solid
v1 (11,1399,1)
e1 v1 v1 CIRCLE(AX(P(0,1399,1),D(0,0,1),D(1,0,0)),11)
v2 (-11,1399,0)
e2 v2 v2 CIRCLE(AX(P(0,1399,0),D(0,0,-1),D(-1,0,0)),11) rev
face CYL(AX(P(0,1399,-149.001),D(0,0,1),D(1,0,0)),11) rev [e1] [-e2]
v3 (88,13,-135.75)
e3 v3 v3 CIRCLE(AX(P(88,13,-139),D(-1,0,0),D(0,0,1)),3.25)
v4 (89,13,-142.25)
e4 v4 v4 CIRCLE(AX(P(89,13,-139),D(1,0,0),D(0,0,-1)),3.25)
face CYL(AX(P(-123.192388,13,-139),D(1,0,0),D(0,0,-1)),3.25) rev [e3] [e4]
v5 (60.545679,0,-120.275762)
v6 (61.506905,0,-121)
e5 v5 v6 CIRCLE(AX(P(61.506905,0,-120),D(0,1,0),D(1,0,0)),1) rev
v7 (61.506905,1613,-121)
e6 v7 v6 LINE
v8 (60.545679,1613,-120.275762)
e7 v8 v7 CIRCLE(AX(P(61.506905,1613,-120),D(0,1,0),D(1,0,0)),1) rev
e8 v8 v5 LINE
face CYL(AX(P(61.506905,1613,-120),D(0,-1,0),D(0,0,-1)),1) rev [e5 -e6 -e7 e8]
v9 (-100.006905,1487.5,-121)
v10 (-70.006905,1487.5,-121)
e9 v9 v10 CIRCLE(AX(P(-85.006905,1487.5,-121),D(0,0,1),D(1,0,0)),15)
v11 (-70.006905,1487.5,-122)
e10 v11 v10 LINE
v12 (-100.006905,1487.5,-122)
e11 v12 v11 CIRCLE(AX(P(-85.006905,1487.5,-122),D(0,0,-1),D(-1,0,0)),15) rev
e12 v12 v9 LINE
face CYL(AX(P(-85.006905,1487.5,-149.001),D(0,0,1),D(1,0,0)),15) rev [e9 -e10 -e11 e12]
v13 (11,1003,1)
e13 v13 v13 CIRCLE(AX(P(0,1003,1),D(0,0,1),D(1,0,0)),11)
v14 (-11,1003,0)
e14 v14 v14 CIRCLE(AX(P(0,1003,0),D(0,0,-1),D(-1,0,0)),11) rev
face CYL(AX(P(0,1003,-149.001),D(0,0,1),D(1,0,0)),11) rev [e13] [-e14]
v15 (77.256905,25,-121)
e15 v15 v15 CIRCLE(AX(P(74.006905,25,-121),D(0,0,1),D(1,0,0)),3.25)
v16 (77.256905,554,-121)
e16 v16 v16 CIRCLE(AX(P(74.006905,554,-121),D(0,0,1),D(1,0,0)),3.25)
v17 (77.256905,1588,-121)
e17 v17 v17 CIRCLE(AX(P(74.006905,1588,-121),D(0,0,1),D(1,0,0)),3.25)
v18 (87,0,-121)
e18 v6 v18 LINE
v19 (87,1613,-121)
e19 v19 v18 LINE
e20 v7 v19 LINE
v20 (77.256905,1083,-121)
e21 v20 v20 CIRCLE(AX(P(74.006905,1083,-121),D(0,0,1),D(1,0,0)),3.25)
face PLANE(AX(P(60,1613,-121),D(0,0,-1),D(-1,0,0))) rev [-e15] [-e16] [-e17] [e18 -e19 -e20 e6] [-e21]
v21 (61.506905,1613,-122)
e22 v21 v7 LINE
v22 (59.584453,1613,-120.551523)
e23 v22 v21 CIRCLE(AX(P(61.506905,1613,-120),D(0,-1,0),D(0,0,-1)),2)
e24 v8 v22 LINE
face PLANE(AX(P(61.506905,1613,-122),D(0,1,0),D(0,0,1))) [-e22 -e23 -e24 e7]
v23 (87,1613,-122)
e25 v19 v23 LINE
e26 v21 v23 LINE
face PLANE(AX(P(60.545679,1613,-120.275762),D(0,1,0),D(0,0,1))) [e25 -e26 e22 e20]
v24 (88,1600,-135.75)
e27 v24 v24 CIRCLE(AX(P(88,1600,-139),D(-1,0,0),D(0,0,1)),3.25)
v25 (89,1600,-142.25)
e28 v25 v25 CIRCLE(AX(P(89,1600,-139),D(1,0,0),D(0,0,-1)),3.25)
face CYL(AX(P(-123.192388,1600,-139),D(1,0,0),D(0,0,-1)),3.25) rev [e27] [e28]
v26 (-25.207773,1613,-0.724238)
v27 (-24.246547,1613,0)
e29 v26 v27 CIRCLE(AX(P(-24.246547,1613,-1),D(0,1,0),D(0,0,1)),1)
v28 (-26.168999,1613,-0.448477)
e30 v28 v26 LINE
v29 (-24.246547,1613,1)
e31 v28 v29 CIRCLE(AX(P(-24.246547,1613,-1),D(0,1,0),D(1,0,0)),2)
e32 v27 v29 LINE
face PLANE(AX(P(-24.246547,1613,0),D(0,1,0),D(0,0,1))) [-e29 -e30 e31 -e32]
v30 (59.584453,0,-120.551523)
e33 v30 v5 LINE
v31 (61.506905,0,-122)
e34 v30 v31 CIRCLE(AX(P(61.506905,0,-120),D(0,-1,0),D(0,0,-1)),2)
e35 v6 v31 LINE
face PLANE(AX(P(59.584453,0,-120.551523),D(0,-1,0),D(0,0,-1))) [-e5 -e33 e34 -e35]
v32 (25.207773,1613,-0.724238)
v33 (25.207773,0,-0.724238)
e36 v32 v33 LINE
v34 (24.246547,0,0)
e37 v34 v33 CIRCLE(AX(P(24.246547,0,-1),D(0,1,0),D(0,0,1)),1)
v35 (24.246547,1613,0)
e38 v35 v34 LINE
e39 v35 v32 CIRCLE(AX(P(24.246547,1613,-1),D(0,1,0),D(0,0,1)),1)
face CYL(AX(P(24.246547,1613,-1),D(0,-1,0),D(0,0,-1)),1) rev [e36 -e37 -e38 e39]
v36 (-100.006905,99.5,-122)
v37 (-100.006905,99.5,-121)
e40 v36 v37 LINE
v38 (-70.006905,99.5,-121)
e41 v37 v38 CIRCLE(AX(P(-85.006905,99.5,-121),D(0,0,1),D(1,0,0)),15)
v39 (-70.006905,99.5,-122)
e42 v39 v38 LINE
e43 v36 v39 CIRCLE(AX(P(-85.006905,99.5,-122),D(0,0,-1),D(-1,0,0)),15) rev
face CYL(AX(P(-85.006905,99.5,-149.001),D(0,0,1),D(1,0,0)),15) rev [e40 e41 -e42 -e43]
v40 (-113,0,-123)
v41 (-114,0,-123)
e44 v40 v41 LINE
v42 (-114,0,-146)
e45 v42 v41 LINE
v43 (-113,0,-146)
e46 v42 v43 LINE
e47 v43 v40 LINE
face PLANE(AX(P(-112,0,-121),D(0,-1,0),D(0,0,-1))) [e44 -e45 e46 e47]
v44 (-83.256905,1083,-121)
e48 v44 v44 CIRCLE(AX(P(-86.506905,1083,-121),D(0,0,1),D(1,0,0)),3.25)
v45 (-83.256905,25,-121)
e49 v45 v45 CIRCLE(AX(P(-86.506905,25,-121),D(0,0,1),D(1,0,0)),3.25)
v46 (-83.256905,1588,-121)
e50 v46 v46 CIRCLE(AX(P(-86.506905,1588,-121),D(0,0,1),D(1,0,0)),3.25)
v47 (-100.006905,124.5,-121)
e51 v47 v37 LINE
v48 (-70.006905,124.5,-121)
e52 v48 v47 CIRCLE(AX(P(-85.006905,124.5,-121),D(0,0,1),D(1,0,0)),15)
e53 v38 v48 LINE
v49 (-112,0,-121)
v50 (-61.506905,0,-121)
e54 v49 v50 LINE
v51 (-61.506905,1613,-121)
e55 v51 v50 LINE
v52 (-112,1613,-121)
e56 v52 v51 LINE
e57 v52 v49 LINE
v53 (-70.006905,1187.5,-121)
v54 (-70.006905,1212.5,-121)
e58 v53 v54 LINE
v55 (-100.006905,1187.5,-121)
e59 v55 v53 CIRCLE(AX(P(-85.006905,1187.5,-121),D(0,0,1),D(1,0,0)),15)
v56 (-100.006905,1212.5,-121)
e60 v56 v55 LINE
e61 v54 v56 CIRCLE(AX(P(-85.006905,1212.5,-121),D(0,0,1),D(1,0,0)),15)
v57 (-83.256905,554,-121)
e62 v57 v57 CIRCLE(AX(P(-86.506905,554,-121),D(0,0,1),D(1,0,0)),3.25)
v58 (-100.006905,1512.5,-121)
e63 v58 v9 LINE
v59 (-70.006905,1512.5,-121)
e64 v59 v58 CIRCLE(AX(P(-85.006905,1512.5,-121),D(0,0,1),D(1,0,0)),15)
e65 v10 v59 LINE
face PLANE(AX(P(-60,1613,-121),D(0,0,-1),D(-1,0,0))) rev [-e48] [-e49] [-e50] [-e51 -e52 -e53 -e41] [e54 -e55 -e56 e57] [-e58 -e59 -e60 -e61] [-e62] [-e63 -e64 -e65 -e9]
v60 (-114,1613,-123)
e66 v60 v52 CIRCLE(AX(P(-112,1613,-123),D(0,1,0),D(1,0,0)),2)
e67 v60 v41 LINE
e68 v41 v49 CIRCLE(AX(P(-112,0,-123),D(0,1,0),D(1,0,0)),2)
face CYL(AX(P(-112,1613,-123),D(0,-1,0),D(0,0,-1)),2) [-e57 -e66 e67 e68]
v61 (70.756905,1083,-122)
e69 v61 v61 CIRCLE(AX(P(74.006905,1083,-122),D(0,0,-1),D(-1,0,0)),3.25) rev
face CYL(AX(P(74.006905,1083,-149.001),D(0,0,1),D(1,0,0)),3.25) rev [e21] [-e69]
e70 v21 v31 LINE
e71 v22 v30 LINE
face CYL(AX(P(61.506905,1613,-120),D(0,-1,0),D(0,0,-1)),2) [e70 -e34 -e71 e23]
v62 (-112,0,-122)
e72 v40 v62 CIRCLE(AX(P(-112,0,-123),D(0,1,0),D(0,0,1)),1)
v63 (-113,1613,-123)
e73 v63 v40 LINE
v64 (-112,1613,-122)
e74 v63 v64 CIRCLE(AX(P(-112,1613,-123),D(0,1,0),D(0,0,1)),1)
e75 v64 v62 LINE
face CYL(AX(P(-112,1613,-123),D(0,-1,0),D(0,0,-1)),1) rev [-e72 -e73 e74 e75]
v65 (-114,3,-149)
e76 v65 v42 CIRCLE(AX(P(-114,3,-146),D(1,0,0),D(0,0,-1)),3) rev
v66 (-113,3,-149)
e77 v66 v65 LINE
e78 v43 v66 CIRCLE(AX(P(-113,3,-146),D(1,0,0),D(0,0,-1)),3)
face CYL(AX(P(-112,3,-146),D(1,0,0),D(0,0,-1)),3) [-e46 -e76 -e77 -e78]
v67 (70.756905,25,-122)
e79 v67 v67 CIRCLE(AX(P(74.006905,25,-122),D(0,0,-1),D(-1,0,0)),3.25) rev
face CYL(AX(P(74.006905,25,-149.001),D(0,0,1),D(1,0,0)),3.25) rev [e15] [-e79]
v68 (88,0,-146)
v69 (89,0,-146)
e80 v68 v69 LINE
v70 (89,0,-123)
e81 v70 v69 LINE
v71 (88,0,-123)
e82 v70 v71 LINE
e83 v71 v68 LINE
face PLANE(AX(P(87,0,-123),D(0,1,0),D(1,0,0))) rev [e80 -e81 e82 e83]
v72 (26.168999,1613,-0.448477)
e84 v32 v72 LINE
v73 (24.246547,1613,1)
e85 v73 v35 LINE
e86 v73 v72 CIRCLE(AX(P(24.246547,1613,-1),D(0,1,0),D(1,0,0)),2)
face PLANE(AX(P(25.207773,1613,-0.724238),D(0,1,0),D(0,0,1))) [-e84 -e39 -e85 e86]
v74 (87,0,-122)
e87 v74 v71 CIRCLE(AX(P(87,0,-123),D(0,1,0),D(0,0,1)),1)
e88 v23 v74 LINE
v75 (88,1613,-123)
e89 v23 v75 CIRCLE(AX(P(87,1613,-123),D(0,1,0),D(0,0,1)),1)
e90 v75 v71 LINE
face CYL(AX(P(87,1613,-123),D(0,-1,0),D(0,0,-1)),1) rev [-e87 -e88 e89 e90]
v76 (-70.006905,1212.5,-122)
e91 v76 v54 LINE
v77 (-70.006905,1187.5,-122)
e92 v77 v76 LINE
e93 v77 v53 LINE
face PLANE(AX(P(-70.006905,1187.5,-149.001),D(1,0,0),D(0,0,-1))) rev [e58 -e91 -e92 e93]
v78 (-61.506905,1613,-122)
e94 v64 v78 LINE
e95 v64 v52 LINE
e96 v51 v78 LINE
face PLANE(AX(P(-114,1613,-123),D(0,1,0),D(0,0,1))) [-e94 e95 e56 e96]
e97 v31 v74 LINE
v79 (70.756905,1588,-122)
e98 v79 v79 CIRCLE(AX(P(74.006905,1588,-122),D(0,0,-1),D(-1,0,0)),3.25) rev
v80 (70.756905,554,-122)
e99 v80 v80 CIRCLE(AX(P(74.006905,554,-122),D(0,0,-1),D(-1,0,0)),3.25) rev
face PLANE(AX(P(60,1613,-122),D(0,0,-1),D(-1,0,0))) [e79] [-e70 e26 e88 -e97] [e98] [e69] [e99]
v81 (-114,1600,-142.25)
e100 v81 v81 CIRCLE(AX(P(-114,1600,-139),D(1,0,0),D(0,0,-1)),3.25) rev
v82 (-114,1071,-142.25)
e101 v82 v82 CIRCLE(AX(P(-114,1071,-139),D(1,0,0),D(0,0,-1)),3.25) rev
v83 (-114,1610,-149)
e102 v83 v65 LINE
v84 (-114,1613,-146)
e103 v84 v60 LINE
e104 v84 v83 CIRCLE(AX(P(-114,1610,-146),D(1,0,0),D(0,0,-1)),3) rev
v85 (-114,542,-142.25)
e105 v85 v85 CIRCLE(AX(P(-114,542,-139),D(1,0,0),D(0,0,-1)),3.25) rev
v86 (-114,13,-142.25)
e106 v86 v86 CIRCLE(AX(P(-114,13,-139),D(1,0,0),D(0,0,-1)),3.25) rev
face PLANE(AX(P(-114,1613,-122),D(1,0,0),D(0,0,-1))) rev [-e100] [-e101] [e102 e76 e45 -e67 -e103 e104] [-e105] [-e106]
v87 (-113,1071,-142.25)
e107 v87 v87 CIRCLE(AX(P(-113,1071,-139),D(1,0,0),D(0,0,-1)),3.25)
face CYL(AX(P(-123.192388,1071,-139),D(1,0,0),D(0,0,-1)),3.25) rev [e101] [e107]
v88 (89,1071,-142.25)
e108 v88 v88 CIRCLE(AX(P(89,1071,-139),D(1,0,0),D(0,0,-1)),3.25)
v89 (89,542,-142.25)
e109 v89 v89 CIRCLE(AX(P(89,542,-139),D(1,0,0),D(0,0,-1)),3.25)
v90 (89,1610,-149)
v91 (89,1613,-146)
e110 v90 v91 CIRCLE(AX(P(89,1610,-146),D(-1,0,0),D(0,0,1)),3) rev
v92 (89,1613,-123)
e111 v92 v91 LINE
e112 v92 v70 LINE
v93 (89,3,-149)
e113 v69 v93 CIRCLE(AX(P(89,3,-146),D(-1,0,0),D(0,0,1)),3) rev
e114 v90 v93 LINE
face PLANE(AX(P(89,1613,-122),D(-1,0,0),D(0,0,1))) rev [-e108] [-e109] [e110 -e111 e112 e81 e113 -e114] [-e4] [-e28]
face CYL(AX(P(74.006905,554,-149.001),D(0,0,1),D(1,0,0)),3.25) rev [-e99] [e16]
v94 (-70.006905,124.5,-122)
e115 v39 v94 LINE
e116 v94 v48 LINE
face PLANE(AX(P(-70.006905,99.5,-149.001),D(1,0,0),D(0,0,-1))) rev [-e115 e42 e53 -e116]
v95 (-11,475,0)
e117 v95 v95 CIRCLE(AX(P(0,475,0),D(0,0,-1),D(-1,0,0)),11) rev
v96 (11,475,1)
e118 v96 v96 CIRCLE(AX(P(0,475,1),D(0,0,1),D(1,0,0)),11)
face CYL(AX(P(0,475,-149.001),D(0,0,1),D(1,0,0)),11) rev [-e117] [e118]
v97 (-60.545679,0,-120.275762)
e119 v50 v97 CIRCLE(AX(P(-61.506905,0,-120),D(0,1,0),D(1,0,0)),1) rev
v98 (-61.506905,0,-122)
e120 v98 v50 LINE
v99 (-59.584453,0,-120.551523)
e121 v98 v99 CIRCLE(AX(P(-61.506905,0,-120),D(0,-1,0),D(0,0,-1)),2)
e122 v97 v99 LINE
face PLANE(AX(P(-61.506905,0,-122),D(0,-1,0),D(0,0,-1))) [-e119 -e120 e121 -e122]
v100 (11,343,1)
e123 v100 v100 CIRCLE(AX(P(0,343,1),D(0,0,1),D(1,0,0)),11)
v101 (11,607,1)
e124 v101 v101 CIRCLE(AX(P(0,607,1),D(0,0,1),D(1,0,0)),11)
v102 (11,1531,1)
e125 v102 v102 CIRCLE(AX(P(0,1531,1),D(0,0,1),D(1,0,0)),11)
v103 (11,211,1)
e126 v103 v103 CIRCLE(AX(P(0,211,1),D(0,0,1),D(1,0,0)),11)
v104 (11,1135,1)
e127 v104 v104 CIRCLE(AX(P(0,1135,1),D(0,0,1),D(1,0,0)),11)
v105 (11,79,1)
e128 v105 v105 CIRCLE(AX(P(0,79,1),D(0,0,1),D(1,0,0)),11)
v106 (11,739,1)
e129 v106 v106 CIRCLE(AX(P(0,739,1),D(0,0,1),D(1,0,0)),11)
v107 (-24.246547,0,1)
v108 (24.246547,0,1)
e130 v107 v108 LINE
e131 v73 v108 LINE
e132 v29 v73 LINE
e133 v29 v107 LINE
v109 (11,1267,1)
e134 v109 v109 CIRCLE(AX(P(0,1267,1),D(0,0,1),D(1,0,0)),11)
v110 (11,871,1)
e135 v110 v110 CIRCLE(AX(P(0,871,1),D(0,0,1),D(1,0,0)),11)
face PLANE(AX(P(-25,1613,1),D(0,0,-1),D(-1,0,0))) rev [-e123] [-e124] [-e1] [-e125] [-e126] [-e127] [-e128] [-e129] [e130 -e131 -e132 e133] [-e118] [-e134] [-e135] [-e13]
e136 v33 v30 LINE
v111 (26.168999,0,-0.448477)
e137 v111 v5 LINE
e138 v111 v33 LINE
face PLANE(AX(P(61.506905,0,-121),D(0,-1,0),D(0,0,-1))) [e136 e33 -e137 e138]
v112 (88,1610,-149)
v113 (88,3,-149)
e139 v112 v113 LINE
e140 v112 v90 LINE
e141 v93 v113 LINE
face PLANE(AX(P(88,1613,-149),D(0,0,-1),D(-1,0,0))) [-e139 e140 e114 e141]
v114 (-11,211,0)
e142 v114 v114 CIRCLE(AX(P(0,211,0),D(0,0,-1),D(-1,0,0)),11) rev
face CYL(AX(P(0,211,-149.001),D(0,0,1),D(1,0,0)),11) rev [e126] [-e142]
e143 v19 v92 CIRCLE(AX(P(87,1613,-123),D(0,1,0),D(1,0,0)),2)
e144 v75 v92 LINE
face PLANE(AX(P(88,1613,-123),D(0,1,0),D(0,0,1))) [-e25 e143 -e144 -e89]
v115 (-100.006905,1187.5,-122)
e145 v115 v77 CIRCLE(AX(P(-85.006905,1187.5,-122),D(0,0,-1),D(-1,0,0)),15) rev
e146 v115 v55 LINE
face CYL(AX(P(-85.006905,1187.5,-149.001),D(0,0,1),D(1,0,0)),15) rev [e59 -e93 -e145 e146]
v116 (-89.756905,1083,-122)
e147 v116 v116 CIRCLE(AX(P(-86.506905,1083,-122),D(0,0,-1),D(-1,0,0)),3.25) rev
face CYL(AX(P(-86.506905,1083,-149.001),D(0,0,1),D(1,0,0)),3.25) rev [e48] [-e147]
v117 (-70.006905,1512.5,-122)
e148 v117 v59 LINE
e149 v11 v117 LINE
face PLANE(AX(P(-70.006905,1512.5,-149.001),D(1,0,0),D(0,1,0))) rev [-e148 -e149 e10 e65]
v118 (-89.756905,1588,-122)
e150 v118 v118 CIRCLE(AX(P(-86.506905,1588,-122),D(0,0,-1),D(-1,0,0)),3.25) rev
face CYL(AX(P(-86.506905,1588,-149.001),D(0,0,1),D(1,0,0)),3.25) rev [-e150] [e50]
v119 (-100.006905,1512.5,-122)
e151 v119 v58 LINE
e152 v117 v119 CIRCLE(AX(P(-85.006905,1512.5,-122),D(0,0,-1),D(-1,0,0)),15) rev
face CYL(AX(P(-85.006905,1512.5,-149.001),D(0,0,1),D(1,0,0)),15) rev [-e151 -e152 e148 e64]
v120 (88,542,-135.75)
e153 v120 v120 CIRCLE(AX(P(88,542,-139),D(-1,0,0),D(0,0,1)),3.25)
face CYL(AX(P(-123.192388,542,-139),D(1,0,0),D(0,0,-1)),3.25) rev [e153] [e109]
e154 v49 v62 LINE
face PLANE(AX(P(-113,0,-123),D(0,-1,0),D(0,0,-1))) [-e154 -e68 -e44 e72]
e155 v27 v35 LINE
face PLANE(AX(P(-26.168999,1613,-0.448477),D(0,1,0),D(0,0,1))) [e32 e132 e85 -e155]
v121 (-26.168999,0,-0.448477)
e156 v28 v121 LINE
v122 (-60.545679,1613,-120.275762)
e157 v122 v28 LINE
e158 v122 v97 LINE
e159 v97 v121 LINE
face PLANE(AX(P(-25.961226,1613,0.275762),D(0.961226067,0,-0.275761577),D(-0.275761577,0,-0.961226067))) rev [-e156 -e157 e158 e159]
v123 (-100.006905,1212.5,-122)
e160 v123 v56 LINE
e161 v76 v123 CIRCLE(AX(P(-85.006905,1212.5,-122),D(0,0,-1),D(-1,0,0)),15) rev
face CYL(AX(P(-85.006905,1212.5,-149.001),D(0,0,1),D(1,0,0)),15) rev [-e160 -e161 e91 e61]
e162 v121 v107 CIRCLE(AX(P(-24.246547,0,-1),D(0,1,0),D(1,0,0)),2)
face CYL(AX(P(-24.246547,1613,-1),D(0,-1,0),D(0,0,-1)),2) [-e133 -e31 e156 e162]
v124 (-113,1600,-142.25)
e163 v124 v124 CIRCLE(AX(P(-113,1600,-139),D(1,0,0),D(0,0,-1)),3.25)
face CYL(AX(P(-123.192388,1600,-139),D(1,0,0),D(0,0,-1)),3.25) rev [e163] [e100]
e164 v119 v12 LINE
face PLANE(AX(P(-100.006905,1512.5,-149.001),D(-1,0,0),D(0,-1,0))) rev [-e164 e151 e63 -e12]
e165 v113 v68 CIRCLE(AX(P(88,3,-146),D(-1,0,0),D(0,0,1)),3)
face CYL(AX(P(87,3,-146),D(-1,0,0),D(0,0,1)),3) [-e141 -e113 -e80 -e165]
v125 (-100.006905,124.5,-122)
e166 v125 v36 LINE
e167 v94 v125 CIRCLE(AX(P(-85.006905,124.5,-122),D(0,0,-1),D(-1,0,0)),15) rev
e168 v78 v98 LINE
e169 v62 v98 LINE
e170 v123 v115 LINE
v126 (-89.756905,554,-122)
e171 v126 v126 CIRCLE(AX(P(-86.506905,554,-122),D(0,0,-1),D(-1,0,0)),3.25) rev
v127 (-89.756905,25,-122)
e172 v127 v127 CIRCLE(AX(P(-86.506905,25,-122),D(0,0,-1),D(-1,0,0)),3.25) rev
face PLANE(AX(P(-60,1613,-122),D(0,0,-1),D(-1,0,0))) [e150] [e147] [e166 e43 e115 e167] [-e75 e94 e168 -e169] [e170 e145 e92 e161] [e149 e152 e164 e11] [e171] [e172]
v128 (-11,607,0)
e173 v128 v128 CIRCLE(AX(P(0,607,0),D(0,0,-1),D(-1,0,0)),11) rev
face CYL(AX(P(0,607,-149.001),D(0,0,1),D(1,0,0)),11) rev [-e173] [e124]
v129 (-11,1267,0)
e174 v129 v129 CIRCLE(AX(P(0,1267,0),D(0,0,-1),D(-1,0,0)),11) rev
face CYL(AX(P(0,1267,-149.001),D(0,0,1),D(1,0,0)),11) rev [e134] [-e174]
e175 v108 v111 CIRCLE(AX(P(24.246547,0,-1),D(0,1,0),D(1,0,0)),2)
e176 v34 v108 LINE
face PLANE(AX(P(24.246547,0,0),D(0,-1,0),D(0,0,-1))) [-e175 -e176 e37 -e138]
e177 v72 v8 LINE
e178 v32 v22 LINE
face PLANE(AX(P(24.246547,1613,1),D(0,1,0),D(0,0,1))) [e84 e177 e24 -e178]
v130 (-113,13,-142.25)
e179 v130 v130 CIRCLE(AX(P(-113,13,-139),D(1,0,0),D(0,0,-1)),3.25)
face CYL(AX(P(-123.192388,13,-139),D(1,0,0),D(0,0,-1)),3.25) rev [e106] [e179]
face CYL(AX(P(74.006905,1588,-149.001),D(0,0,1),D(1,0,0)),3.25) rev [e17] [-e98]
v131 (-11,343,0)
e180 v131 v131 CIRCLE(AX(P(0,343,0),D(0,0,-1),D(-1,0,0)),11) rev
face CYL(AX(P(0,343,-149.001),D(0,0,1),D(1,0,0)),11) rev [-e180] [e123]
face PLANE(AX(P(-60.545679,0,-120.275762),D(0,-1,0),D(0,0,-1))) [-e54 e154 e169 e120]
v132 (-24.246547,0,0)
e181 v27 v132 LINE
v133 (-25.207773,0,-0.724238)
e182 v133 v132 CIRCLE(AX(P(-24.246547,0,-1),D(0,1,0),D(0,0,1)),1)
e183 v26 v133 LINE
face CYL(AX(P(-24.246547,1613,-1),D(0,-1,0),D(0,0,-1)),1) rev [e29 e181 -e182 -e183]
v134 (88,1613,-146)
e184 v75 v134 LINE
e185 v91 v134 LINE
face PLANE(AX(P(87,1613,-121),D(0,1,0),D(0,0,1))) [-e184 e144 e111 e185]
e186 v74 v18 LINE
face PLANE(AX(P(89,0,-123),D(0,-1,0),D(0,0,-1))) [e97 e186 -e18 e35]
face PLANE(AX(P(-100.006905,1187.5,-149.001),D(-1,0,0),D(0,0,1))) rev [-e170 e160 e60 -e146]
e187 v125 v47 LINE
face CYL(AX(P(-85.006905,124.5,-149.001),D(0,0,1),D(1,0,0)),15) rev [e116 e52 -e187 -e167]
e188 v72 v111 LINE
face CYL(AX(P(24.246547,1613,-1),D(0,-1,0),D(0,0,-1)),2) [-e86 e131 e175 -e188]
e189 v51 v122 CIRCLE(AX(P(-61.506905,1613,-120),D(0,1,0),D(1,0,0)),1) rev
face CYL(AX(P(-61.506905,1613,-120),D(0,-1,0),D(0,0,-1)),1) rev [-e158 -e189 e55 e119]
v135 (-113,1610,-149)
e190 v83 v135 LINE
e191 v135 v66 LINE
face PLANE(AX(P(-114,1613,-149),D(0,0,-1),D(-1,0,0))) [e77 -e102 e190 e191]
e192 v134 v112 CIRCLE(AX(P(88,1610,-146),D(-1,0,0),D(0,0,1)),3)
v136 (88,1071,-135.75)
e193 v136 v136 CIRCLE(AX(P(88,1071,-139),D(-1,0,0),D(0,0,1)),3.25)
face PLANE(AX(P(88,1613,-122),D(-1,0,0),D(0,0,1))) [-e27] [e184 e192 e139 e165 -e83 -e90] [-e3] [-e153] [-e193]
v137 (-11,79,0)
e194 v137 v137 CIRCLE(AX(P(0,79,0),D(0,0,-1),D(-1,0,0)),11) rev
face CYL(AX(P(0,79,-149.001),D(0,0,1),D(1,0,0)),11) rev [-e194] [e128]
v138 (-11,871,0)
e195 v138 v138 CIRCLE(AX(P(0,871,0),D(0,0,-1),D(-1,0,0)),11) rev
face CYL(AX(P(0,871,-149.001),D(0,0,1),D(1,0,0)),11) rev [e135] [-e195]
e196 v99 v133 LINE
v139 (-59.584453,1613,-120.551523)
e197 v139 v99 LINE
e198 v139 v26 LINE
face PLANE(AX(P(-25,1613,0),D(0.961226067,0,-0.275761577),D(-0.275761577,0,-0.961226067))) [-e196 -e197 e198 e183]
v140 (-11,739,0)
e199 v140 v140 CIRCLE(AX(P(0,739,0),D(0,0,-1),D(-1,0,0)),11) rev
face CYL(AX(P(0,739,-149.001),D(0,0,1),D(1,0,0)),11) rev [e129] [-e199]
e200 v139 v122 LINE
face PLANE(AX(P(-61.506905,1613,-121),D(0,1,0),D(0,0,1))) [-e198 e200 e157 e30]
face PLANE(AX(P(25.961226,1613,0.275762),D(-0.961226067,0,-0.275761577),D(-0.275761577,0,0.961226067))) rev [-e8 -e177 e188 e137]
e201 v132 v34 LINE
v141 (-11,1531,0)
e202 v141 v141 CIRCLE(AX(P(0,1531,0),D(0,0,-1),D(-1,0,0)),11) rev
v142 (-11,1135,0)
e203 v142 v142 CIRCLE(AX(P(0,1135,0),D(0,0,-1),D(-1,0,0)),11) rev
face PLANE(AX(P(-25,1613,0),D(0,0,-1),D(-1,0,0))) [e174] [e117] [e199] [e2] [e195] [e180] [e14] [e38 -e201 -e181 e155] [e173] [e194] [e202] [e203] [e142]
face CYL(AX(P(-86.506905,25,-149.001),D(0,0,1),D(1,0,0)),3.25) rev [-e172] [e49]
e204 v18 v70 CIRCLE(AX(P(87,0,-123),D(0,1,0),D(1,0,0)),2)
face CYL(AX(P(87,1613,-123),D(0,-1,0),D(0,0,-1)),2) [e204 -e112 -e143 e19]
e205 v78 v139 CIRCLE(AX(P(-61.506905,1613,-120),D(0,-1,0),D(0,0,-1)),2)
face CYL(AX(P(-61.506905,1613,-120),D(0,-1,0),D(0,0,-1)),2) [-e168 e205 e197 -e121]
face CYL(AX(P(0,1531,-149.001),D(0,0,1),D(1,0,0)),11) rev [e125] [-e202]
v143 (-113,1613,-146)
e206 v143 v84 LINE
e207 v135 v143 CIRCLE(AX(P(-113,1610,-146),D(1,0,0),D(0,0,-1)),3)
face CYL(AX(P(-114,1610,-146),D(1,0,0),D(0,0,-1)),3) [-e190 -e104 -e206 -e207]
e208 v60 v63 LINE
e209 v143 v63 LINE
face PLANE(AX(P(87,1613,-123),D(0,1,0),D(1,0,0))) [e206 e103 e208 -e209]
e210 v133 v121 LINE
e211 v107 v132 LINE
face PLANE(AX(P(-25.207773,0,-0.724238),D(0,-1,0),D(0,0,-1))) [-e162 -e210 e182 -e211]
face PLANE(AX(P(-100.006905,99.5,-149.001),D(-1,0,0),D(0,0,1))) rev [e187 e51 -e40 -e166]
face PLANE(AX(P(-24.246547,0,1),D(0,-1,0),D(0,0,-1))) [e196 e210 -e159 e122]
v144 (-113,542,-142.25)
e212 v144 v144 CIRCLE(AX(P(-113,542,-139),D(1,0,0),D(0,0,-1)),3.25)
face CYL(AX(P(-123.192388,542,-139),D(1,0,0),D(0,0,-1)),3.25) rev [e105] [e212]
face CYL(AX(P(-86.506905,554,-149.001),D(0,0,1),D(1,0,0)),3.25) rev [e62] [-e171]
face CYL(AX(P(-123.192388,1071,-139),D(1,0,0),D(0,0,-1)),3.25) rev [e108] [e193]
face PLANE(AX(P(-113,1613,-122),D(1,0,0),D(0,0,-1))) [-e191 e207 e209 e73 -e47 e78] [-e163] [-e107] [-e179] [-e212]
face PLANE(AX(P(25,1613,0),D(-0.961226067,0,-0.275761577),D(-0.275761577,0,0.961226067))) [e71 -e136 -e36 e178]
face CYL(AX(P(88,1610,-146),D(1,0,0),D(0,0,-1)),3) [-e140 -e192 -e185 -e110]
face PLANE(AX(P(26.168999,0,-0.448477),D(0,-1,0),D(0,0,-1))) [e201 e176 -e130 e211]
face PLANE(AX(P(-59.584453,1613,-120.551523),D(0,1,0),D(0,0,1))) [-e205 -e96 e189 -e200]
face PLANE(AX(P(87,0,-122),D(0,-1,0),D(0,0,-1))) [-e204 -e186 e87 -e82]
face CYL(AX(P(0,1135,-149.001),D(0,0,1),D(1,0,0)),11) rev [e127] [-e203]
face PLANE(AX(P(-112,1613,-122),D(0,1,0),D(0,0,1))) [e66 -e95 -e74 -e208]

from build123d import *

# Parameters (mm, degrees)
BASE_FLANGE1_DEPTH = 1613
FILLET1_R          = 3
CUT_EXTRUDE1_REACH = 1625.966
SKETCH6_R          = 11
LPATTERN1_COUNT    = 15
LPATTERN1_PITCH    = 132
CUT_EXTRUDE4_REACH = 1634.045
SKETCH10_R         = 3.25
LPATTERN5_COUNT    = 4
LPATTERN5_PITCH    = 529
CUT_EXTRUDE5_REACH = 1623.619
CUT_EXTRUDE6_REACH = 1623.619
SKETCH13_R         = 3.25
CUT_EXTRUDE7_REACH = 1623.619
SKETCH14_R         = 3.25
LPATTERN6_COUNT    = 3
LPATTERN6_PITCH    = 529
CUT_EXTRUDE8_REACH = 1623.619
SKETCH15_R         = 3.25


# Sheet-metal steps are written as plain solids
with BuildPart() as part:
    # Sketch1 → Base-Flange1 (new body)
    with BuildSketch(Plane(origin=(0, 0, 0), x_dir=(1, 0, 0), z_dir=(0, 1, 0))):
        with BuildLine():
            Line((-113, 149), (-113, 123))
            ThreePointArc((-113, 123), (-112.707106781, 122.292893219), (-112, 122))
            Line((-112, 122), (-61.506905499, 122))
            ThreePointArc((-61.506905499, 122), (-60.303378662, 121.597348789), (-59.584453364, 120.551523153))
            Line((-59.584453364, 120.551523153), (-25.207773318, 0.724238423))
            ThreePointArc((-25.207773318, 0.724238423), (-24.848310669, 0.201325606), (-24.246547251, 0))
            Line((-24.246547251, 0), (24.246547251, 0))
            ThreePointArc((24.246547251, 0), (24.848310669, 0.201325606), (25.207773318, 0.724238423))
            Line((25.207773318, 0.724238423), (59.584453364, 120.551523153))
            ThreePointArc((59.584453364, 120.551523153), (60.303378662, 121.597348789), (61.506905499, 122))
            Line((61.506905499, 122), (87, 122))
            ThreePointArc((87, 122), (87.707106781, 122.292893219), (88, 123))
            Line((88, 123), (88, 149))
            Line((88, 149), (89, 149))
            Line((89, 149), (89, 123))
            ThreePointArc((89, 123), (88.414213562, 121.585786438), (87, 121))
            Line((87, 121), (61.506905499, 121))
            ThreePointArc((61.506905499, 121), (60.90514208, 120.798674394), (60.545679431, 120.275761577))
            Line((60.545679431, 120.275761577), (26.168999386, 0.448476847))
            ThreePointArc((26.168999386, 0.448476847), (25.450074087, -0.597348789), (24.246547251, -1))
            Line((24.246547251, -1), (-24.246547251, -1))
            ThreePointArc((-24.246547251, -1), (-25.450074087, -0.597348789), (-26.168999386, 0.448476847))
            Line((-26.168999386, 0.448476847), (-60.545679431, 120.275761577))
            ThreePointArc((-60.545679431, 120.275761577), (-60.90514208, 120.798674394), (-61.506905499, 121))
            Line((-61.506905499, 121), (-112, 121))
            ThreePointArc((-112, 121), (-113.414213562, 121.585786438), (-114, 123))
            Line((-114, 123), (-114, 149))
            Line((-114, 149), (-113, 149))
        make_face()
    extrude(amount=BASE_FLANGE1_DEPTH)

    # Fillet1
    fillet1_edges = [part.edges().sort_by_distance(p)[0] for p in [
        (-113.5, 0, -149),
        (88.5, 0, -149),
        (-113.5, 1613, -149),
        (88.5, 1613, -149),
    ]]
    fillet(fillet1_edges, radius=FILLET1_R)

    # Sketch6 → Cut-Extrude1 (cut, up to next)
    with BuildSketch(Plane.XY.offset(1), mode=Mode.PRIVATE) as cut_extrude1_sk1:
        with Locations((0, 79)):
            Circle(SKETCH6_R)
    cut_extrude1_tool1 = extrude(cut_extrude1_sk1.sketch, amount=-CUT_EXTRUDE1_REACH, mode=Mode.PRIVATE) & part.part
    cut_extrude1 = cut_extrude1_tool1.solids().sort_by_distance((0, 79, 1))[0]
    add(cut_extrude1, mode=Mode.SUBTRACT)

    # LPattern1: Cut-Extrude1 ×15
    with Locations(*[(0, i * LPATTERN1_PITCH, 0) for i in range(1, LPATTERN1_COUNT)]):
        add(cut_extrude1, mode=Mode.SUBTRACT)

    # Cut-Extrude4: up to this face of the body (flat: up to its plane)
    cut_extrude4_end = Plane(part.part.faces().sort_by_distance((-114, 806.5, -135.998864211))[0])
    # Sketch10 → Cut-Extrude4 (cut, up to the picked face)
    with BuildSketch(Plane(origin=(89, 0, -5.5), x_dir=(0, 0, -1), z_dir=(1, 0, 0)), mode=Mode.PRIVATE) as cut_extrude4_sk1:
        with Locations((133.5, 13)):
            Circle(SKETCH10_R)
    cut_extrude4_tool1 = split(extrude(cut_extrude4_sk1.sketch, amount=-CUT_EXTRUDE4_REACH, mode=Mode.PRIVATE), bisect_by=cut_extrude4_end, keep=Keep.BOTH, mode=Mode.PRIVATE)
    cut_extrude4 = cut_extrude4_tool1.solids().sort_by(Axis((89, 13, -139), (-1, 0, 0)))[0]
    add(cut_extrude4, mode=Mode.SUBTRACT)

    # LPattern5: Cut-Extrude4 ×4
    with Locations(*[(0, i * LPATTERN5_PITCH, 0) for i in range(1, LPATTERN5_COUNT)]):
        add(cut_extrude4, mode=Mode.SUBTRACT)

    # Sketch12 → Cut-Extrude5 (cut, up to next)
    with BuildSketch(Plane.XY.offset(-121), mode=Mode.PRIVATE) as cut_extrude5_sk1:
        with BuildLine():
            Line((-100.006905499, 99.5), (-100.006905499, 124.5))
            ThreePointArc((-100.006905499, 124.5), (-85.006905499, 139.5), (-70.006905499, 124.5))
            Line((-70.006905499, 124.5), (-70.006905499, 99.5))
            ThreePointArc((-70.006905499, 99.5), (-85.006905499, 84.5), (-100.006905499, 99.5))
        make_face()
    cut_extrude5_tool1 = extrude(cut_extrude5_sk1.sketch, amount=-CUT_EXTRUDE5_REACH, mode=Mode.PRIVATE) & part.part
    # Sketch12 → Cut-Extrude5 (cut, up to next)
    with BuildSketch(Plane.XY.offset(-121), mode=Mode.PRIVATE) as cut_extrude5_sk2:
        with BuildLine():
            Line((-100.006905499, 1187.5), (-100.006905499, 1212.5))
            ThreePointArc((-100.006905499, 1212.5), (-85.006905499, 1227.5), (-70.006905499, 1212.5))
            Line((-70.006905499, 1212.5), (-70.006905499, 1187.5))
            ThreePointArc((-70.006905499, 1187.5), (-85.006905499, 1172.5), (-100.006905499, 1187.5))
        make_face()
    cut_extrude5_tool2 = extrude(cut_extrude5_sk2.sketch, amount=-CUT_EXTRUDE5_REACH, mode=Mode.PRIVATE) & part.part
    # Sketch12 → Cut-Extrude5 (cut, up to next)
    with BuildSketch(Plane.XY.offset(-121), mode=Mode.PRIVATE) as cut_extrude5_sk3:
        with BuildLine():
            Line((-70.006905499, 1512.5), (-70.006905499, 1487.5))
            ThreePointArc((-70.006905499, 1487.5), (-85.006905499, 1472.5), (-100.006905499, 1487.5))
            Line((-100.006905499, 1487.5), (-100.006905499, 1512.5))
            ThreePointArc((-100.006905499, 1512.5), (-85.006905499, 1527.5), (-70.006905499, 1512.5))
        make_face()
    cut_extrude5_tool3 = extrude(cut_extrude5_sk3.sketch, amount=-CUT_EXTRUDE5_REACH, mode=Mode.PRIVATE) & part.part
    add(cut_extrude5_tool1.solids().sort_by_distance((-85.006905, 112, -121))[0], mode=Mode.SUBTRACT)
    add(cut_extrude5_tool2.solids().sort_by_distance((-85.006905, 1200, -121))[0], mode=Mode.SUBTRACT)
    add(cut_extrude5_tool3.solids().sort_by_distance((-85.006905, 1500, -121))[0], mode=Mode.SUBTRACT)

    # Sketch13 → Cut-Extrude6 (cut, up to next)
    with BuildSketch(Plane.XY.offset(-121), mode=Mode.PRIVATE) as cut_extrude6_sk1:
        with Locations((-86.506905499, 25)):
            Circle(SKETCH13_R)
    cut_extrude6_tool1 = extrude(cut_extrude6_sk1.sketch, amount=-CUT_EXTRUDE6_REACH, mode=Mode.PRIVATE) & part.part
    cut_extrude6 = cut_extrude6_tool1.solids().sort_by_distance((-86.506905, 25, -121))[0]
    add(cut_extrude6, mode=Mode.SUBTRACT)

    # Sketch14 → Cut-Extrude7 (cut, up to next)
    with BuildSketch(Plane.XY.offset(-121), mode=Mode.PRIVATE) as cut_extrude7_sk1:
        with Locations((74.006905499, 25)):
            Circle(SKETCH14_R)
    cut_extrude7_tool1 = extrude(cut_extrude7_sk1.sketch, amount=-CUT_EXTRUDE7_REACH, mode=Mode.PRIVATE) & part.part
    cut_extrude7 = cut_extrude7_tool1.solids().sort_by_distance((74.006905, 25, -121))[0]
    add(cut_extrude7, mode=Mode.SUBTRACT)

    # LPattern6: Cut-Extrude6, Cut-Extrude7 ×3
    with Locations(*[(0, i * LPATTERN6_PITCH, 0) for i in range(1, LPATTERN6_COUNT)]):
        add(cut_extrude6, mode=Mode.SUBTRACT)
        add(cut_extrude7, mode=Mode.SUBTRACT)

    # Sketch15 → Cut-Extrude8 (cut, up to next)
    with BuildSketch(Plane.XY.offset(-121), mode=Mode.PRIVATE) as cut_extrude8_sk1:
        with Locations((-86.506905499, 1588)):
            Circle(SKETCH15_R)
    cut_extrude8_tool1 = extrude(cut_extrude8_sk1.sketch, amount=-CUT_EXTRUDE8_REACH, mode=Mode.PRIVATE) & part.part
    # Sketch15 → Cut-Extrude8 (cut, up to next)
    with BuildSketch(Plane.XY.offset(-121), mode=Mode.PRIVATE) as cut_extrude8_sk2:
        with Locations((74.006905499, 1588)):
            Circle(SKETCH15_R)
    cut_extrude8_tool2 = extrude(cut_extrude8_sk2.sketch, amount=-CUT_EXTRUDE8_REACH, mode=Mode.PRIVATE) & part.part
    add(cut_extrude8_tool1.solids().sort_by_distance((-86.506905, 1588, -121))[0], mode=Mode.SUBTRACT)
    add(cut_extrude8_tool2.solids().sort_by_distance((74.006905, 1588, -121))[0], mode=Mode.SUBTRACT)


solid = part.part
